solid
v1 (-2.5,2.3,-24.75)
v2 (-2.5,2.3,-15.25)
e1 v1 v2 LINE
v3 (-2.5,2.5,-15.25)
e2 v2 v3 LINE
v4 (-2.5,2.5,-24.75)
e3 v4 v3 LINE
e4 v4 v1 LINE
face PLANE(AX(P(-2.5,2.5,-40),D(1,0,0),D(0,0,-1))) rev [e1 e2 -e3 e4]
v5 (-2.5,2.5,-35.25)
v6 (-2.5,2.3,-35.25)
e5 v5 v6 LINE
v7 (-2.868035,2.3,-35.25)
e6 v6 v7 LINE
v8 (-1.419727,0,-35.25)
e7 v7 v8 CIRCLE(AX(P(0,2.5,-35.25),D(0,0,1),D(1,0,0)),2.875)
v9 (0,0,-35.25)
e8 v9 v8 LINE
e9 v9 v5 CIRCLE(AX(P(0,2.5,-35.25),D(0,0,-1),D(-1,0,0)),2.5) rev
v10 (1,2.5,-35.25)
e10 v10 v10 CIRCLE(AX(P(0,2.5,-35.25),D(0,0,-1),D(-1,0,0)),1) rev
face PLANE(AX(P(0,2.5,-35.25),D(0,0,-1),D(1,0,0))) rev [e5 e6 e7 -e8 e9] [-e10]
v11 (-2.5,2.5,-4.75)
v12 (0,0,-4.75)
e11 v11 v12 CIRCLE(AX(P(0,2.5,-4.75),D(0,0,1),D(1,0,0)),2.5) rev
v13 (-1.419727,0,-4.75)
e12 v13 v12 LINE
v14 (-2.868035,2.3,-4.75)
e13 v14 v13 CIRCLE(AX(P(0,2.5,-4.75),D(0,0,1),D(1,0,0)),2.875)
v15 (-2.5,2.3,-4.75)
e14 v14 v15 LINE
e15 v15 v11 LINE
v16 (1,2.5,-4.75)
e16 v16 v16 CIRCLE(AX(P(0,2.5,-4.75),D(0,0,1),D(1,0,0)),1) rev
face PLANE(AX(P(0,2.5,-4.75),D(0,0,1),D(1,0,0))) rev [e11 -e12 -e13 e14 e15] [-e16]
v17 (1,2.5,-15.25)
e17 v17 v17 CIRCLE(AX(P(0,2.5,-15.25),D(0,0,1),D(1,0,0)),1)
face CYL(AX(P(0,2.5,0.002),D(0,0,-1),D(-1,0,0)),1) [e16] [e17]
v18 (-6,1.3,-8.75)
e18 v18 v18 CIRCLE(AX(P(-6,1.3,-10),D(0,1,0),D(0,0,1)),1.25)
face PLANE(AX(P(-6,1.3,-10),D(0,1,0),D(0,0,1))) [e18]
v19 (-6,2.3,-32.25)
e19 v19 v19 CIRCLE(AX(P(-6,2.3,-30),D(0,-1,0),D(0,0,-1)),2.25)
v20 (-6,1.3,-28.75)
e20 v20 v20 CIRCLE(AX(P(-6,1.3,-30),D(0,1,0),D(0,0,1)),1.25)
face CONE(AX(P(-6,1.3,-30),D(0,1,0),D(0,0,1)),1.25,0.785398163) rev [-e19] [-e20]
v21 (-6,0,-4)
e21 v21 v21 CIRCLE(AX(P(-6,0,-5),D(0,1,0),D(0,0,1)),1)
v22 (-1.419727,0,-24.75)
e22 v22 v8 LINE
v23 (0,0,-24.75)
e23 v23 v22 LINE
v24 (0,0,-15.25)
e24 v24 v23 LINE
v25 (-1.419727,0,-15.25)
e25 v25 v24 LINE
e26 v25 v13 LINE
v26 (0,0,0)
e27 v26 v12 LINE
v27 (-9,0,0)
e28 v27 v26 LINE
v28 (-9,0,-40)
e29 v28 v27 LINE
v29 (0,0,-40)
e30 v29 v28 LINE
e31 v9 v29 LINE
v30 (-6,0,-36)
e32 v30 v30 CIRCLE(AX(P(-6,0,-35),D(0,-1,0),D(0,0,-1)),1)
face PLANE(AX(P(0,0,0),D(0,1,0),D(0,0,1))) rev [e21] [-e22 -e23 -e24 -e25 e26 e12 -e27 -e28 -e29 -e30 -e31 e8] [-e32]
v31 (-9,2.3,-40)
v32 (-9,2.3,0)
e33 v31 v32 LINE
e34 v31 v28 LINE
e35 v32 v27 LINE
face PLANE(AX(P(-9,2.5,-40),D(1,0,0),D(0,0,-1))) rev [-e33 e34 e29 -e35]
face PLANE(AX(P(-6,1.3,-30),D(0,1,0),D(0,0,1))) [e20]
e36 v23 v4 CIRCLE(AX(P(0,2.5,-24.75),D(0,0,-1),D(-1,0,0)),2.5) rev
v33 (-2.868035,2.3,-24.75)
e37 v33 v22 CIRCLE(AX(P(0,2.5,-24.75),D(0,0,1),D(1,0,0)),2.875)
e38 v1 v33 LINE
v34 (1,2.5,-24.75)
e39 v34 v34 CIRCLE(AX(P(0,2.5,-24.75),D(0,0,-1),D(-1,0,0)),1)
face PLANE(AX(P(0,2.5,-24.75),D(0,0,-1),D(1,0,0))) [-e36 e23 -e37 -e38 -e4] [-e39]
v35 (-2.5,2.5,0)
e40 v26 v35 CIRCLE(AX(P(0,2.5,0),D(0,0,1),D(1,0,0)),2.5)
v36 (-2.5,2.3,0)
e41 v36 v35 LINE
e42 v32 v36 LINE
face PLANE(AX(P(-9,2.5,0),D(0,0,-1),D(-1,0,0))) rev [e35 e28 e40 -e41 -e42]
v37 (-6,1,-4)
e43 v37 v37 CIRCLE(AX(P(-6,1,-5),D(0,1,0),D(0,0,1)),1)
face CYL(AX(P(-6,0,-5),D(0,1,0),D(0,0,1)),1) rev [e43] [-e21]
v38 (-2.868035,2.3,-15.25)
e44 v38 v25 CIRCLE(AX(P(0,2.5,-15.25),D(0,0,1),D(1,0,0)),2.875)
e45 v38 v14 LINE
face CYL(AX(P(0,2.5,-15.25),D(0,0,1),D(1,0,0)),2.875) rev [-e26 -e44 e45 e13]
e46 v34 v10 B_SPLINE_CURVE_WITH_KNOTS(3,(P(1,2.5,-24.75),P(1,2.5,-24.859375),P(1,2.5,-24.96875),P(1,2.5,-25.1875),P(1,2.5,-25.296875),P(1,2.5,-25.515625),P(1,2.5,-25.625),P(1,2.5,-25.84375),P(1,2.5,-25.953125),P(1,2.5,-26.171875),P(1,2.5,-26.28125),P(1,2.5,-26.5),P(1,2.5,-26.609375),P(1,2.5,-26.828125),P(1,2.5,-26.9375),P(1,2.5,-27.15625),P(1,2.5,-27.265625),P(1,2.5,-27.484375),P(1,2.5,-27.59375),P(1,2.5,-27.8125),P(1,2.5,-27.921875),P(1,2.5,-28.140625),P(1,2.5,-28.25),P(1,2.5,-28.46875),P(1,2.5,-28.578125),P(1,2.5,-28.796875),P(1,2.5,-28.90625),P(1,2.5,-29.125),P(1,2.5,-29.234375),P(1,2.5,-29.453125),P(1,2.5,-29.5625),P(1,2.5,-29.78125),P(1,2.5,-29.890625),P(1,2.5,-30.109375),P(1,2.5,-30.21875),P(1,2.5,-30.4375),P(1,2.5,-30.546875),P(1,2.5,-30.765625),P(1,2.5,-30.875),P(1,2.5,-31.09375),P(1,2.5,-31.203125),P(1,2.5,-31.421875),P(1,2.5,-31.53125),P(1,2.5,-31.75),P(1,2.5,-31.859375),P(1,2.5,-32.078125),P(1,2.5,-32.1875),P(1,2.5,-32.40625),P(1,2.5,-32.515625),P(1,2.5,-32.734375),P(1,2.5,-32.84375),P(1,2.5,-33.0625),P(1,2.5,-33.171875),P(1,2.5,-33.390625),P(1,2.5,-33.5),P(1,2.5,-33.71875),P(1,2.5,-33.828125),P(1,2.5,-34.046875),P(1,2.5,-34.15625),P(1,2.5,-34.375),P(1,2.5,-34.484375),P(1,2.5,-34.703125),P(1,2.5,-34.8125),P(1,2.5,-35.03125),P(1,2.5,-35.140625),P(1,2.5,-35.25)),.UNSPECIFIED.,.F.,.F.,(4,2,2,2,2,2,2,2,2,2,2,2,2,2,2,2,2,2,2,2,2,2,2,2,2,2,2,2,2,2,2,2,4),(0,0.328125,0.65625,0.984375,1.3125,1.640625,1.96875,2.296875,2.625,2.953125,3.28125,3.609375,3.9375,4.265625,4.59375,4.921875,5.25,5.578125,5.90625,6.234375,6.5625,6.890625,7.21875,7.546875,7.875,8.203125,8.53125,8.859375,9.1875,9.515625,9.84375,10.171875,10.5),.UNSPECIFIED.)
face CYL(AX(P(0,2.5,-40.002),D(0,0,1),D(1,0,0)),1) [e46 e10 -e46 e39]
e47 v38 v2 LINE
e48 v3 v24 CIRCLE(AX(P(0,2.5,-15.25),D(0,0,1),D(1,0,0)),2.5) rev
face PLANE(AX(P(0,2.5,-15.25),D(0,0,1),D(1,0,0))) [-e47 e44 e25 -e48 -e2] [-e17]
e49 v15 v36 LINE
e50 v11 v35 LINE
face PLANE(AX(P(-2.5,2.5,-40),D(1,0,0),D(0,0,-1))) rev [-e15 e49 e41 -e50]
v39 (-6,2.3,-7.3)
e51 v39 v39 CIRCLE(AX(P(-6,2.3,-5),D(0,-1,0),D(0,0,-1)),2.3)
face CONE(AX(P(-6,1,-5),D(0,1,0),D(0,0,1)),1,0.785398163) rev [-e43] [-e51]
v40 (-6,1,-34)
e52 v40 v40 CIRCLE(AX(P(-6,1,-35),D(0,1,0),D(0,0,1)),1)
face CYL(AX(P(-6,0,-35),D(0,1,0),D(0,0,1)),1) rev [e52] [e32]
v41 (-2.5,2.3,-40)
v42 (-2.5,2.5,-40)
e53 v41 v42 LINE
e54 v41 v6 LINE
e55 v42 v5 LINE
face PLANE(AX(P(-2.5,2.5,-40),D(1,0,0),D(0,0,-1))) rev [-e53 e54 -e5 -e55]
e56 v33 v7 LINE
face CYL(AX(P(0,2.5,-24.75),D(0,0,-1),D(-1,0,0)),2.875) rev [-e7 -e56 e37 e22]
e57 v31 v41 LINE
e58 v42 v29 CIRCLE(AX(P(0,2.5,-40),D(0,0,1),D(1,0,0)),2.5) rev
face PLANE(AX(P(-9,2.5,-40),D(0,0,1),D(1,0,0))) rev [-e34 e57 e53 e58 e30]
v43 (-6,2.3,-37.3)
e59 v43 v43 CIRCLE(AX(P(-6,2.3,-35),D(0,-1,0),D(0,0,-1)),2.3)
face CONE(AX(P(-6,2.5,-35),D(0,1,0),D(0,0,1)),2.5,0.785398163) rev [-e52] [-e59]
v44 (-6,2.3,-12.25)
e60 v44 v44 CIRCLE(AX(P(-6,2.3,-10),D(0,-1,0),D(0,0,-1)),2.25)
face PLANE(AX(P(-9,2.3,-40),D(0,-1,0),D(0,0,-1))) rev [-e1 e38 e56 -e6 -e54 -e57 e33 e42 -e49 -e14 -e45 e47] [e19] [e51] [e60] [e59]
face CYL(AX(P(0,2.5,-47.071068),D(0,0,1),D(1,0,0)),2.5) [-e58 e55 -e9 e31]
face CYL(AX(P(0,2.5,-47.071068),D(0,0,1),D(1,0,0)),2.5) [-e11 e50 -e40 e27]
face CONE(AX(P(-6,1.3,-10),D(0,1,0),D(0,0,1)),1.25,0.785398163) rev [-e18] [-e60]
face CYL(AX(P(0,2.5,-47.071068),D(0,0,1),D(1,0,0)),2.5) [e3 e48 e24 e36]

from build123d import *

# Parameters (mm, degrees)
SKETCH1_W           = 9
SKETCH1_H           = 40
BOSS_EXTRUDE1_DEPTH = 2.5
SKETCH2_R           = 2.5
BOSS_EXTRUDE2_DEPTH = 40
CUT_EXTRUDE1_START  = -4.75
SKETCH3_R           = 2.875
CUT_EXTRUDE1_DEPTH  = 10.5
BOSS_EXTRUDE3_REACH = 28.806
SKETCH4_R           = 1
SKETCH5_R           = 1
CUT_EXTRUDE2_DEPTH  = 42.076148797
CHAMFER1_SIZE       = 1.5
CHAMFER2_SIZE       = 1.5
SKETCH6_W           = 6.5
SKETCH6_H           = 0.2
CUT_EXTRUDE3_DEPTH  = 42.303752856
SKETCH7_R           = 1.25
CUT_EXTRUDE4_DEPTH  = 1
CHAMFER3_SIZE       = 1


with BuildPart() as part:
    # Sketch1 → Boss-Extrude1 (new body)
    with BuildSketch(Plane(origin=(0, 0, 0), x_dir=(1, 0, 0), z_dir=(0, 1, 0))):
        with Locations((-4.5, 20)):
            Rectangle(SKETCH1_W, SKETCH1_H)
    extrude(amount=BOSS_EXTRUDE1_DEPTH)

    # Sketch2 → Boss-Extrude2 (add)
    with BuildSketch(Plane.XY):
        with Locations((0, 2.5)):
            Circle(SKETCH2_R)
    extrude(amount=-BOSS_EXTRUDE2_DEPTH)

    # Sketch3 → Cut-Extrude1 (cut)
    with BuildSketch(Plane.XY.offset(CUT_EXTRUDE1_START)):
        with Locations((0, 2.5)):
            Circle(SKETCH3_R)
    cut_extrude1 = extrude(amount=-CUT_EXTRUDE1_DEPTH, mode=Mode.SUBTRACT)

    # Mirror1: Cut-Extrude1 across plane
    add(cut_extrude1.mirror(Plane.XY.offset(-20)), mode=Mode.SUBTRACT)

    # Sketch4 → Boss-Extrude3 (add, up to next)
    with BuildSketch(Plane.XY.offset(-15.25), mode=Mode.PRIVATE) as boss_extrude3_sk1:
        with Locations((0, 2.5)):
            Circle(SKETCH4_R)
    boss_extrude3_tool1 = extrude(boss_extrude3_sk1.sketch, amount=BOSS_EXTRUDE3_REACH, mode=Mode.PRIVATE) - part.part
    boss_extrude3 = boss_extrude3_tool1.solids().sort_by_distance((0, 2.5, -15.25))[0]
    add(boss_extrude3)

    # Mirror2: Boss-Extrude3 across plane
    add(boss_extrude3.mirror(Plane.XY.offset(-20)))

    # Sketch5 → Cut-Extrude2 (cut, through all)
    with BuildSketch(Plane(origin=(0, 2.5, 0), x_dir=(1, 0, 0), z_dir=(0, 1, 0))):
        with Locations(Location((-6, 5, 0), (0, 0, 270))):
            Circle(SKETCH5_R)
    cut_extrude2 = extrude(amount=-CUT_EXTRUDE2_DEPTH, mode=Mode.SUBTRACT)

    # Mirror3: Cut-Extrude2 across plane
    add(cut_extrude2.mirror(Plane.XY.offset(-20)), mode=Mode.SUBTRACT)

    # Chamfer1
    chamfer1_edges = [part.edges().sort_by_distance(p)[0] for p in [
        (-6, 2.5, -6),
    ]]
    chamfer(chamfer1_edges, length=CHAMFER1_SIZE)

    # Chamfer2
    chamfer2_edges = [part.edges().sort_by_distance(p)[0] for p in [
        (-6, 2.5, -34),
    ]]
    chamfer(chamfer2_edges, length=CHAMFER2_SIZE)

    # Sketch6 → Cut-Extrude3 (cut, through all)
    with BuildSketch(Plane.XY):
        with Locations((-5.75, 2.4)):
            Rectangle(SKETCH6_W, SKETCH6_H)
    extrude(amount=-CUT_EXTRUDE3_DEPTH, mode=Mode.SUBTRACT)

    # Sketch7 → Cut-Extrude4 (cut)
    with BuildSketch(Plane(origin=(0, 2.3, 0), x_dir=(1, 0, 0), z_dir=(0, 1, 0))):
        with Locations(Location((-6, 30, 0), (0, 0, 270))):
            Circle(SKETCH7_R)
        with Locations(Location((-6, 10, 0), (0, 0, 270))):
            Circle(SKETCH7_R)
    extrude(amount=-CUT_EXTRUDE4_DEPTH, mode=Mode.SUBTRACT)

    # Chamfer3
    chamfer3_edges = [part.edges().sort_by_distance(p)[0] for p in [
        (-6, 2.3, -31.25),
        (-6, 2.3, -11.25),
    ]]
    chamfer(chamfer3_edges, length=CHAMFER3_SIZE - 0.0001)  # a hair under: the kernel refuses the full size


solid = part.part
